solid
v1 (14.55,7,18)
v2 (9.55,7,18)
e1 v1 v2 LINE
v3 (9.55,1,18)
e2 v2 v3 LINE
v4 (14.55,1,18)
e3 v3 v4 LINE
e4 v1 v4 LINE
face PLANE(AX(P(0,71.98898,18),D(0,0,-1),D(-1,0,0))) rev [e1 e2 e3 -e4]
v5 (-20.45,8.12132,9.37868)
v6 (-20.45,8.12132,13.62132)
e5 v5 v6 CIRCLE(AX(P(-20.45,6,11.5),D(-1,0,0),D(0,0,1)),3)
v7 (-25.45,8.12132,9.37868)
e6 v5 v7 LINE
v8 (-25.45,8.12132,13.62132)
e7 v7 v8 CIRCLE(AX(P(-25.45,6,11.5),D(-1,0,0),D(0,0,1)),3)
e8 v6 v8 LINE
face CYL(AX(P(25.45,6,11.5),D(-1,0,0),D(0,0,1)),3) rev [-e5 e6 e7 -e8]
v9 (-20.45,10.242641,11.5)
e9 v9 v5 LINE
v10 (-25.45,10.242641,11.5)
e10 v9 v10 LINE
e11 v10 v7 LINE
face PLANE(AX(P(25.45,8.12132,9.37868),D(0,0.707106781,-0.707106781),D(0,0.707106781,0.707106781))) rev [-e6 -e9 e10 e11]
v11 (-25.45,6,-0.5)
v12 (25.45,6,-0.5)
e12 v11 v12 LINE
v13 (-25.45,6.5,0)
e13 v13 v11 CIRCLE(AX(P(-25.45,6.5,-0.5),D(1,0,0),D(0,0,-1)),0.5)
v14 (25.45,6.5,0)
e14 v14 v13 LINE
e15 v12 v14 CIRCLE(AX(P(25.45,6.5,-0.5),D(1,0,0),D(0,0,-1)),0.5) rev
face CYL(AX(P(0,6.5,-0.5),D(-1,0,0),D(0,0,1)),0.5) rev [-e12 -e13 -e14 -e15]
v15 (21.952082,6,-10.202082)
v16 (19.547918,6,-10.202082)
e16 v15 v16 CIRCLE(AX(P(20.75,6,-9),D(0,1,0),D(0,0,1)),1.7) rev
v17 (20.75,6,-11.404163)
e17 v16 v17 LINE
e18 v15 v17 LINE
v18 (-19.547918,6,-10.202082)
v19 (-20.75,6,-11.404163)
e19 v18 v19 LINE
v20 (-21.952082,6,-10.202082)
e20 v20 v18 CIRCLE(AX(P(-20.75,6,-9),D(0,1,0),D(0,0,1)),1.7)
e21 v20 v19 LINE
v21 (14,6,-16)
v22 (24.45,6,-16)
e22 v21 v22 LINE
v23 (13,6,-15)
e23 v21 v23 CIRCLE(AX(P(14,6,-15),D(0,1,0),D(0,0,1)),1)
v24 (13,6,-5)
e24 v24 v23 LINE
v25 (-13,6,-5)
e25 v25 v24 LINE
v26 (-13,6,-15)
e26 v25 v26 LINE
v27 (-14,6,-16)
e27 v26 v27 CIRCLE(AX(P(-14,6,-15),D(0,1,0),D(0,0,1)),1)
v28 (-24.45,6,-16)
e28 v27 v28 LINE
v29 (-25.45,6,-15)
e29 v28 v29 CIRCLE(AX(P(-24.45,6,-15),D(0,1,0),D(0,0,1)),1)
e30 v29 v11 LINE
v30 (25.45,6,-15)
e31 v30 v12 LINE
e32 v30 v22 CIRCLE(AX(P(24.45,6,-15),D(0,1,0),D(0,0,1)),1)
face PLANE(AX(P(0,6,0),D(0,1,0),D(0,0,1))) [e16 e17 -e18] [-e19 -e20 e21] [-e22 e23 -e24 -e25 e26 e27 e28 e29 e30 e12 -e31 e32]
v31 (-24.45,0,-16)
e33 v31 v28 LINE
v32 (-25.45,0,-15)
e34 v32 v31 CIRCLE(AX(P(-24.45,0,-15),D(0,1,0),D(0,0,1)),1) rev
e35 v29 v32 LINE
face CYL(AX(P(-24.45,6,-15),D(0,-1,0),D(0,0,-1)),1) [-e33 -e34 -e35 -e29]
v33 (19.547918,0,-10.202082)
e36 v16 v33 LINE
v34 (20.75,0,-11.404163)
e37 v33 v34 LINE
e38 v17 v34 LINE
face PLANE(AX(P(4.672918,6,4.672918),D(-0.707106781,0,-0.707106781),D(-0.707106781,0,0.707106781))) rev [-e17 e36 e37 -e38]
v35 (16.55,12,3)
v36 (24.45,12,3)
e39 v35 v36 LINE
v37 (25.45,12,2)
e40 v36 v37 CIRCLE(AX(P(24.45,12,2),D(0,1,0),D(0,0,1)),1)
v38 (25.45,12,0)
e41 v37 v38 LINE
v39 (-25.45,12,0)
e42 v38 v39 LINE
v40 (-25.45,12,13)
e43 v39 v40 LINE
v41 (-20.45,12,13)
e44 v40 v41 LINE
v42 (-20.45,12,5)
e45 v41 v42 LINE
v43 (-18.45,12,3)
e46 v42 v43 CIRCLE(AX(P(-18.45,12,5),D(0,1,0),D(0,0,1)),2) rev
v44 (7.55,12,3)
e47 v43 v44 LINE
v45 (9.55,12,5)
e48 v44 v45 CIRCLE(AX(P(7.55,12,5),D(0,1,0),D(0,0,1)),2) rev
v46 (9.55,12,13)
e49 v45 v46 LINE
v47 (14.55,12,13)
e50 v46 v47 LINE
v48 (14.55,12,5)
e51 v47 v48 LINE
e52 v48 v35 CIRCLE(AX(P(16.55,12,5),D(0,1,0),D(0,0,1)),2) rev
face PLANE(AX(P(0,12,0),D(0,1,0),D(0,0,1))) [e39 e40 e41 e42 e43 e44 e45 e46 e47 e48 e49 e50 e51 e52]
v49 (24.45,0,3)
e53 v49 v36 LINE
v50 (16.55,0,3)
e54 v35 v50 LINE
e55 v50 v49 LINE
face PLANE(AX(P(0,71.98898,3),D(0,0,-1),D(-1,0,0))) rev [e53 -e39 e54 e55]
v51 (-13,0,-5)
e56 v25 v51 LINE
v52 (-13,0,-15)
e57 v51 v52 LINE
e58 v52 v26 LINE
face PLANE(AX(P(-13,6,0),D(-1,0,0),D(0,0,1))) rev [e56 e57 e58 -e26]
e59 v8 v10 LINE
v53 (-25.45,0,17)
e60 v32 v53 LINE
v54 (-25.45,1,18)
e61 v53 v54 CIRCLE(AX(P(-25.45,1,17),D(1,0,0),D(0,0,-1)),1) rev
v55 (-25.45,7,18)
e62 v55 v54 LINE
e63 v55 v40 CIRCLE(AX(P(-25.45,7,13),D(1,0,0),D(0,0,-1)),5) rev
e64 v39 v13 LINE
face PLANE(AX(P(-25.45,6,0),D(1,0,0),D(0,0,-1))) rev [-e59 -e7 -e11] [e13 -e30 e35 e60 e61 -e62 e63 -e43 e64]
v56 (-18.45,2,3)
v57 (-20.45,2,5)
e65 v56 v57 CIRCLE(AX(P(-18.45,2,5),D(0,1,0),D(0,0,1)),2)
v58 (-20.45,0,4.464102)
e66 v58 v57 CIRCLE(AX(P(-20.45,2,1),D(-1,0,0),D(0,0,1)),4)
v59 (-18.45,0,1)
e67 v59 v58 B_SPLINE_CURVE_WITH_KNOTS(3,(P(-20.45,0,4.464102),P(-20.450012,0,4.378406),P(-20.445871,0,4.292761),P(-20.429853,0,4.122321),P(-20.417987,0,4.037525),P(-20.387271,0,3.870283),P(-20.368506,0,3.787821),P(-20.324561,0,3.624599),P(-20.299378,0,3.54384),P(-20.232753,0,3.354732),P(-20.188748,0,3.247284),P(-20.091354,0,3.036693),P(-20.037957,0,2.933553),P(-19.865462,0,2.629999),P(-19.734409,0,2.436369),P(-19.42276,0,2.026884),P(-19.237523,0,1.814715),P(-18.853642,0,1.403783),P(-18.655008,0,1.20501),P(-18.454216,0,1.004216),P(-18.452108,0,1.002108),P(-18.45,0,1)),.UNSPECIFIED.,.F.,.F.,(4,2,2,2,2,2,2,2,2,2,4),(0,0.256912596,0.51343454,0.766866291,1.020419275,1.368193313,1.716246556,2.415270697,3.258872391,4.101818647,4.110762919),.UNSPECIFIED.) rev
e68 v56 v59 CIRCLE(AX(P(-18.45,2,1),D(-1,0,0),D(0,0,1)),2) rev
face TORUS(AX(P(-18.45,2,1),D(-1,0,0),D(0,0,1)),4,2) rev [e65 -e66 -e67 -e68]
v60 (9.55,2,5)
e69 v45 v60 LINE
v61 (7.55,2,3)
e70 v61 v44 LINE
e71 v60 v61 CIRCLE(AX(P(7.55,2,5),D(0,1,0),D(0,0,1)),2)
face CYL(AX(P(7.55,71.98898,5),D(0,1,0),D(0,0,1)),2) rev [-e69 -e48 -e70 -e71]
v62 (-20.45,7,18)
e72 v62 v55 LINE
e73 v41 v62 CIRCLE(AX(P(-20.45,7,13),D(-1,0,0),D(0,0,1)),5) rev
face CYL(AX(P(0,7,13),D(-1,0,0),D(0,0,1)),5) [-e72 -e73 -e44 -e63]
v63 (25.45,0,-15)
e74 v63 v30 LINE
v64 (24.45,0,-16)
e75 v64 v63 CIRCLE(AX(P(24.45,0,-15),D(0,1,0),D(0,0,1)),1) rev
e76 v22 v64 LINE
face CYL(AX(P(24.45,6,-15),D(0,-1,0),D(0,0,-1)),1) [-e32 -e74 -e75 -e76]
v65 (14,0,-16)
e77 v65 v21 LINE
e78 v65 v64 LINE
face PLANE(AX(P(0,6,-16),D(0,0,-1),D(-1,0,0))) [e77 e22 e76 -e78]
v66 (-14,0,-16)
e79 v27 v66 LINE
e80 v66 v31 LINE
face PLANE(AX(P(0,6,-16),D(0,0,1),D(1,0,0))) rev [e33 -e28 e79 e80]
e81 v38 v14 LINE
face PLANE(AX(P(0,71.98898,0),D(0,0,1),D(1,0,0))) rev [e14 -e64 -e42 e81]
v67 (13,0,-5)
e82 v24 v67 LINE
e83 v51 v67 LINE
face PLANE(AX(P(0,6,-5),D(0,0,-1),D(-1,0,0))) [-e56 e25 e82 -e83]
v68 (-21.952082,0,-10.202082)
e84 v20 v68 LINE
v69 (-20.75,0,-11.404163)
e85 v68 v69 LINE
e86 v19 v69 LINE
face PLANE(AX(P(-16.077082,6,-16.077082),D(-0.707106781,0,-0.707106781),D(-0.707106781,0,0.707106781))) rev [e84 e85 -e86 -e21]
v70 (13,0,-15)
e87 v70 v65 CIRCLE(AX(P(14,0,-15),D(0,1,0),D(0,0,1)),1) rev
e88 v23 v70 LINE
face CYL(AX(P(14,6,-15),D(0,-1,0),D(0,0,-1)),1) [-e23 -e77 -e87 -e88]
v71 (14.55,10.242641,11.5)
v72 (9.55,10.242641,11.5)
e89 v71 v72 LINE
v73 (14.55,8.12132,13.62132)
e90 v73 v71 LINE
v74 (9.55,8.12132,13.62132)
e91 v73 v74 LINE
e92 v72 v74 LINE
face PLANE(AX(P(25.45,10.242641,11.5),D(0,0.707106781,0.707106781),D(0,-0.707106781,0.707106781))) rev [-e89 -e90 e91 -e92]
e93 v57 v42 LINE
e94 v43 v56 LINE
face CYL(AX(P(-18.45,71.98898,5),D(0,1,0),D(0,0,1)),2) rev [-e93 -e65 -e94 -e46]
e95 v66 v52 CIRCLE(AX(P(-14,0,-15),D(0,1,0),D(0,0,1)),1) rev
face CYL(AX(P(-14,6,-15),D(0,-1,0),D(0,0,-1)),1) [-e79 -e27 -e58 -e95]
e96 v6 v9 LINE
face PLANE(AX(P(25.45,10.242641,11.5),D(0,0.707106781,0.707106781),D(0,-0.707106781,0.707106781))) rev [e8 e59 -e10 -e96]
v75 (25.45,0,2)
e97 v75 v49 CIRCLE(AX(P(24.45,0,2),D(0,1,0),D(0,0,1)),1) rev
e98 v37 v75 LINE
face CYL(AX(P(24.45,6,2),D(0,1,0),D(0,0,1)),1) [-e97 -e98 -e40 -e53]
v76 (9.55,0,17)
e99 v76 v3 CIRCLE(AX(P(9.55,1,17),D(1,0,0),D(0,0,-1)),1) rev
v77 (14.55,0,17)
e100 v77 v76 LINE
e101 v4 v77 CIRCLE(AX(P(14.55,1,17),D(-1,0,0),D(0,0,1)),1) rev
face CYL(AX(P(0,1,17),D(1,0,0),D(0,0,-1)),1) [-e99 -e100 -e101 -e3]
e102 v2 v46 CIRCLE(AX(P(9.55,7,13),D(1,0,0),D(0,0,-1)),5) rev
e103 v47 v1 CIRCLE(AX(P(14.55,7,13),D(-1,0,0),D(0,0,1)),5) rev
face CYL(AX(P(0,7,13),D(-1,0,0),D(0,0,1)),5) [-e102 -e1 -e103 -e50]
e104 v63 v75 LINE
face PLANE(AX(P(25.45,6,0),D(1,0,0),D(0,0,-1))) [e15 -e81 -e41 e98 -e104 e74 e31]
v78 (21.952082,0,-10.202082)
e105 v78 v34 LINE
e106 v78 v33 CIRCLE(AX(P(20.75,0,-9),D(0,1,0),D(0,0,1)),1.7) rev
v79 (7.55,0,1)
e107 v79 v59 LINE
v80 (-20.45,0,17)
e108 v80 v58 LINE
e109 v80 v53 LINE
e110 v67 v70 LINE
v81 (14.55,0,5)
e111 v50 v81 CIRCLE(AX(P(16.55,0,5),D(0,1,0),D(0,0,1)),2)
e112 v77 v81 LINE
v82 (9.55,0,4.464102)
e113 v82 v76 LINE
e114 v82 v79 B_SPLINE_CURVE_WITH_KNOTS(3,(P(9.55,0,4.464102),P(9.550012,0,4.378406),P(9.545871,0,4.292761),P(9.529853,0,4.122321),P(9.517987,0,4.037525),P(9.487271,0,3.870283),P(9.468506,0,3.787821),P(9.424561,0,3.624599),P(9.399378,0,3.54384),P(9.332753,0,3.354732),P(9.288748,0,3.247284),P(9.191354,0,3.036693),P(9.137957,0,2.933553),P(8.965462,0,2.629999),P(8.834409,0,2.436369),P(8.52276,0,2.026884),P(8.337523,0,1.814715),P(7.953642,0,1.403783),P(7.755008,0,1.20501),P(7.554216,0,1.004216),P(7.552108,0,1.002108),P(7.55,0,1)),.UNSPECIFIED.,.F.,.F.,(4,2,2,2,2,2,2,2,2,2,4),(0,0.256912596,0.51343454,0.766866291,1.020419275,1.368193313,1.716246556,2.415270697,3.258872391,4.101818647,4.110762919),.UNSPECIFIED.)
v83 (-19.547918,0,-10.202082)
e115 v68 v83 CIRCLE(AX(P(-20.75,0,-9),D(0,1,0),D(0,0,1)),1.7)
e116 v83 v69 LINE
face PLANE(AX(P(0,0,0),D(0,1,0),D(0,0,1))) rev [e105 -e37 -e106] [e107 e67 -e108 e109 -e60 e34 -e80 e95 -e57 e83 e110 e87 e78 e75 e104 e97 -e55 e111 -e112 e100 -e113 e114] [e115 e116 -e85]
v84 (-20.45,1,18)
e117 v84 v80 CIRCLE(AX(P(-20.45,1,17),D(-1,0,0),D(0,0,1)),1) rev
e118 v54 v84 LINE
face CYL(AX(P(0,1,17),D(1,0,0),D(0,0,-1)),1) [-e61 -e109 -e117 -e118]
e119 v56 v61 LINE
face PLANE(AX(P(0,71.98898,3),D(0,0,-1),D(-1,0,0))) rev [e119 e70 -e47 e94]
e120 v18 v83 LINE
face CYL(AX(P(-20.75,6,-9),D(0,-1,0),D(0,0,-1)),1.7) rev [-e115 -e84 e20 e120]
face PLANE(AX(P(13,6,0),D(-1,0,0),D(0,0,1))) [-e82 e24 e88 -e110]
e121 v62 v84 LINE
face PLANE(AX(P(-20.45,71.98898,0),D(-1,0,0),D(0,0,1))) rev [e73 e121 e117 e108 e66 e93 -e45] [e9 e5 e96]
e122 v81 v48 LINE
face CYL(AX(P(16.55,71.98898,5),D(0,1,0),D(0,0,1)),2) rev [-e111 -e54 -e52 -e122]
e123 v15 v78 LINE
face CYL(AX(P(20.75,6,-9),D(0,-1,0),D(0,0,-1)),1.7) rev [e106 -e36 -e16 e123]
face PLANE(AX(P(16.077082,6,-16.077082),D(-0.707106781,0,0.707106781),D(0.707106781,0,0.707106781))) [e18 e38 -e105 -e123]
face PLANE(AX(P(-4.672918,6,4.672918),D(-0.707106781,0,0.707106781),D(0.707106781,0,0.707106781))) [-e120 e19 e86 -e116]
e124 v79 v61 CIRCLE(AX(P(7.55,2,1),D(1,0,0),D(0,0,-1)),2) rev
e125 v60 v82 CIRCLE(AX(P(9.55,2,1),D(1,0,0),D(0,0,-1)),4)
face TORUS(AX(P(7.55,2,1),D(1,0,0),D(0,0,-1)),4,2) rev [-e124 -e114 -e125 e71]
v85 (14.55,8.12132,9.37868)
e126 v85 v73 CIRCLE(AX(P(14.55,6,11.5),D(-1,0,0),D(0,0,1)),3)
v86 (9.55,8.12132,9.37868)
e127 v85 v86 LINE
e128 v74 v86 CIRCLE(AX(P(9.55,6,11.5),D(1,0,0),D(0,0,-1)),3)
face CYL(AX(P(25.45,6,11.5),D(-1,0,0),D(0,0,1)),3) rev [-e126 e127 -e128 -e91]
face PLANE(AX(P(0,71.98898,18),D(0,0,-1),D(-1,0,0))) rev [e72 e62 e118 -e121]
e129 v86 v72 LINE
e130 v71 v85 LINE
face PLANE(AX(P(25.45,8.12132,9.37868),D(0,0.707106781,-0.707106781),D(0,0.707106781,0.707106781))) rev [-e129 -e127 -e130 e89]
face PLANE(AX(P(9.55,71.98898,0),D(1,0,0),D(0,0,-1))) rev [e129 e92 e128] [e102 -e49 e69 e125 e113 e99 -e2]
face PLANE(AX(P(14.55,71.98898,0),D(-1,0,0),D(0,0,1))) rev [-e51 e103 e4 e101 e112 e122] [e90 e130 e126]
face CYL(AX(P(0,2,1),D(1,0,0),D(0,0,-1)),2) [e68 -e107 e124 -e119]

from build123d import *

# Parameters (mm, degrees)
BOSS_EXTRUDE2_DEPTH = 6
BOSS_EXTRUDE4_DEPTH = 12
CUT_EXTRUDE4_DEPTH  = 56.306509563
FILLET3_R           = 5
FILLET7_R           = 2
FILLET4_R           = 2
FILLET5_R           = 0.5
FILLET6_R           = 1


with BuildPart() as part:
    # Sketch1 → Boss-Extrude2 (new body)
    with BuildSketch(Plane(origin=(0, 0, 0), x_dir=(1, 0, 0), z_dir=(0, 1, 0))):
        Polygon((13, 5), (-13, 5), (-13, 16), (-25.45, 16), (-25.45, 0), (25.45, 0), (25.45, 16), (13, 16), align=None)
        with BuildLine():
            ThreePointArc((-19.547918472, 10.202081528), (-20.75, 7.3), (-21.952081528, 10.202081528))
            Line((-21.952081528, 10.202081528), (-20.75, 11.404163056))
            Line((-20.75, 11.404163056), (-19.547918472, 10.202081528))
        make_face(mode=Mode.SUBTRACT)
        with BuildLine():
            Line((20.75, 11.404163056), (21.952081528, 10.202081528))
            ThreePointArc((21.952081528, 10.202081528), (20.75, 7.3), (19.547918472, 10.202081528))
            Line((19.547918472, 10.202081528), (20.75, 11.404163056))
        make_face(mode=Mode.SUBTRACT)
    extrude(amount=BOSS_EXTRUDE2_DEPTH)

    # Sketch1<4> → Boss-Extrude4 (add)
    with BuildSketch(Plane(origin=(0, 0, 0), x_dir=(1, 0, 0), z_dir=(0, 1, 0))):
        Polygon((25.45, 0), (-25.45, 0), (-25.45, -18), (-20.45, -18), (-20.45, -3), (9.55, -3), (9.55, -18), (14.55, -18), (14.55, -3), (25.45, -3), align=None)
    extrude(amount=BOSS_EXTRUDE4_DEPTH)

    # Sketch9 → Cut-Extrude4 (cut, through all)
    with BuildSketch(Plane.ZY.offset(25.45)):
        with BuildLine():
            Line((9.378679656, 8.121320344), (11.5, 10.242640687))
            Line((11.5, 10.242640687), (13.621320344, 8.121320344))
            ThreePointArc((13.621320344, 8.121320344), (11.5, 3), (9.378679656, 8.121320344))
        make_face()
    extrude(amount=-CUT_EXTRUDE4_DEPTH, mode=Mode.SUBTRACT)

    # Fillet3
    fillet3_edges = [part.edges().sort_by_distance(p)[0] for p in [
        (-22.95, 12, 18),
        (12.05, 12, 18),
    ]]
    fillet(fillet3_edges, radius=FILLET3_R)

    # Fillet7
    fillet7_edges = [part.edges().sort_by_distance(p)[0] for p in [
        (-5.45, 0, 3),
    ]]
    fillet(fillet7_edges, radius=FILLET7_R)

    # Fillet4
    # the kernel refuses this fillet: 2 mm, written as the material it adds along each edge
    with BuildSketch(Plane(origin=(9.55, 2, 1), x_dir=(0, 0.8017442392976483, -0.5976672776328277), z_dir=(0, 0.5976672776328277, 0.8017442392976483))) as fillet4_piece_1_section:
        with BuildLine():
            CenterArc((2 + FILLET4_R, FILLET4_R), FILLET4_R, 180, 90)
            Line((2, FILLET4_R), (2, 0))
            Line((2, 0), (2 + FILLET4_R, 0))
        make_face()
    fillet4_piece_1 = revolve(axis=Axis((9.55, 2, 1), (-1, 0, 0)), revolution_arc=233.296989237, mode=Mode.PRIVATE)
    fillet4_piece_1 = split(fillet4_piece_1, bisect_by=Plane(origin=(8.926743459, 0, 2.499877942), z_dir=(0, 1, 0)), keep=Keep.TOP, mode=Mode.PRIVATE)
    add(fillet4_piece_1)
    with BuildSketch(Plane(origin=(-20.45, 2, 1), x_dir=(0, 0.8017442392976483, -0.5976672776328277), z_dir=(0, 0.5976672776328277, 0.8017442392976483))) as fillet4_piece_2_section:
        with BuildLine():
            CenterArc((2 + FILLET4_R, -FILLET4_R), FILLET4_R, 90, 90)
            Line((2 + FILLET4_R, 0), (2, 0))
            Line((2, 0), (2, -FILLET4_R))
        make_face()
    fillet4_piece_2 = revolve(axis=Axis((-20.45, 2, 1), (-1, 0, 0)), revolution_arc=233.296989237, mode=Mode.PRIVATE)
    fillet4_piece_2 = split(fillet4_piece_2, bisect_by=Plane(origin=(-19.826743524, 0, 2.499877995), z_dir=(0, 1, 0)), keep=Keep.TOP, mode=Mode.PRIVATE)
    add(fillet4_piece_2)
    with BuildSketch(Plane(origin=(14.55, 0, 3), x_dir=(1, 0, 0), z_dir=(0, 1, 0))) as fillet4_piece_3:
        with BuildLine():
            CenterArc((FILLET4_R, -FILLET4_R), FILLET4_R, 90, 90)
            Line((0, -FILLET4_R), (0, 0))
            Line((0, 0), (FILLET4_R, 0))
        make_face()
    extrude(amount=12)
    with BuildSketch(Plane(origin=(-20.45, 2, 3), x_dir=(1, 0, 0), z_dir=(0, 1, 0))) as fillet4_piece_4:
        with BuildLine():
            CenterArc((FILLET4_R, -FILLET4_R), FILLET4_R, 90, 90)
            Line((0, -FILLET4_R), (0, 0))
            Line((0, 0), (FILLET4_R, 0))
        make_face()
    extrude(amount=10)
    with BuildSketch(Plane(origin=(9.55, 2, 3), x_dir=(-1, 0, 0), z_dir=(0, 1, 0))) as fillet4_piece_5:
        with BuildLine():
            CenterArc((FILLET4_R, FILLET4_R), FILLET4_R, 180, 90)
            Line((0, FILLET4_R), (0, 0))
            Line((0, 0), (FILLET4_R, 0))
        make_face()
    extrude(amount=10)

    # Fillet5
    fillet5_edges = [part.edges().sort_by_distance(p)[0] for p in [
        (0, 6, 0),
    ]]
    fillet(fillet5_edges, radius=FILLET5_R)

    # Fillet6
    fillet6_edges = [part.edges().sort_by_distance(p)[0] for p in [
        (-25.45, 3, -16),
        (-13, 3, -16),
        (13, 3, -16),
        (25.45, 3, -16),
        (25.45, 6, 3),
        (-22.95, 0, 18),
        (12.05, 0, 18),
    ]]
    fillet(fillet6_edges, radius=FILLET6_R)


solid = part.part
